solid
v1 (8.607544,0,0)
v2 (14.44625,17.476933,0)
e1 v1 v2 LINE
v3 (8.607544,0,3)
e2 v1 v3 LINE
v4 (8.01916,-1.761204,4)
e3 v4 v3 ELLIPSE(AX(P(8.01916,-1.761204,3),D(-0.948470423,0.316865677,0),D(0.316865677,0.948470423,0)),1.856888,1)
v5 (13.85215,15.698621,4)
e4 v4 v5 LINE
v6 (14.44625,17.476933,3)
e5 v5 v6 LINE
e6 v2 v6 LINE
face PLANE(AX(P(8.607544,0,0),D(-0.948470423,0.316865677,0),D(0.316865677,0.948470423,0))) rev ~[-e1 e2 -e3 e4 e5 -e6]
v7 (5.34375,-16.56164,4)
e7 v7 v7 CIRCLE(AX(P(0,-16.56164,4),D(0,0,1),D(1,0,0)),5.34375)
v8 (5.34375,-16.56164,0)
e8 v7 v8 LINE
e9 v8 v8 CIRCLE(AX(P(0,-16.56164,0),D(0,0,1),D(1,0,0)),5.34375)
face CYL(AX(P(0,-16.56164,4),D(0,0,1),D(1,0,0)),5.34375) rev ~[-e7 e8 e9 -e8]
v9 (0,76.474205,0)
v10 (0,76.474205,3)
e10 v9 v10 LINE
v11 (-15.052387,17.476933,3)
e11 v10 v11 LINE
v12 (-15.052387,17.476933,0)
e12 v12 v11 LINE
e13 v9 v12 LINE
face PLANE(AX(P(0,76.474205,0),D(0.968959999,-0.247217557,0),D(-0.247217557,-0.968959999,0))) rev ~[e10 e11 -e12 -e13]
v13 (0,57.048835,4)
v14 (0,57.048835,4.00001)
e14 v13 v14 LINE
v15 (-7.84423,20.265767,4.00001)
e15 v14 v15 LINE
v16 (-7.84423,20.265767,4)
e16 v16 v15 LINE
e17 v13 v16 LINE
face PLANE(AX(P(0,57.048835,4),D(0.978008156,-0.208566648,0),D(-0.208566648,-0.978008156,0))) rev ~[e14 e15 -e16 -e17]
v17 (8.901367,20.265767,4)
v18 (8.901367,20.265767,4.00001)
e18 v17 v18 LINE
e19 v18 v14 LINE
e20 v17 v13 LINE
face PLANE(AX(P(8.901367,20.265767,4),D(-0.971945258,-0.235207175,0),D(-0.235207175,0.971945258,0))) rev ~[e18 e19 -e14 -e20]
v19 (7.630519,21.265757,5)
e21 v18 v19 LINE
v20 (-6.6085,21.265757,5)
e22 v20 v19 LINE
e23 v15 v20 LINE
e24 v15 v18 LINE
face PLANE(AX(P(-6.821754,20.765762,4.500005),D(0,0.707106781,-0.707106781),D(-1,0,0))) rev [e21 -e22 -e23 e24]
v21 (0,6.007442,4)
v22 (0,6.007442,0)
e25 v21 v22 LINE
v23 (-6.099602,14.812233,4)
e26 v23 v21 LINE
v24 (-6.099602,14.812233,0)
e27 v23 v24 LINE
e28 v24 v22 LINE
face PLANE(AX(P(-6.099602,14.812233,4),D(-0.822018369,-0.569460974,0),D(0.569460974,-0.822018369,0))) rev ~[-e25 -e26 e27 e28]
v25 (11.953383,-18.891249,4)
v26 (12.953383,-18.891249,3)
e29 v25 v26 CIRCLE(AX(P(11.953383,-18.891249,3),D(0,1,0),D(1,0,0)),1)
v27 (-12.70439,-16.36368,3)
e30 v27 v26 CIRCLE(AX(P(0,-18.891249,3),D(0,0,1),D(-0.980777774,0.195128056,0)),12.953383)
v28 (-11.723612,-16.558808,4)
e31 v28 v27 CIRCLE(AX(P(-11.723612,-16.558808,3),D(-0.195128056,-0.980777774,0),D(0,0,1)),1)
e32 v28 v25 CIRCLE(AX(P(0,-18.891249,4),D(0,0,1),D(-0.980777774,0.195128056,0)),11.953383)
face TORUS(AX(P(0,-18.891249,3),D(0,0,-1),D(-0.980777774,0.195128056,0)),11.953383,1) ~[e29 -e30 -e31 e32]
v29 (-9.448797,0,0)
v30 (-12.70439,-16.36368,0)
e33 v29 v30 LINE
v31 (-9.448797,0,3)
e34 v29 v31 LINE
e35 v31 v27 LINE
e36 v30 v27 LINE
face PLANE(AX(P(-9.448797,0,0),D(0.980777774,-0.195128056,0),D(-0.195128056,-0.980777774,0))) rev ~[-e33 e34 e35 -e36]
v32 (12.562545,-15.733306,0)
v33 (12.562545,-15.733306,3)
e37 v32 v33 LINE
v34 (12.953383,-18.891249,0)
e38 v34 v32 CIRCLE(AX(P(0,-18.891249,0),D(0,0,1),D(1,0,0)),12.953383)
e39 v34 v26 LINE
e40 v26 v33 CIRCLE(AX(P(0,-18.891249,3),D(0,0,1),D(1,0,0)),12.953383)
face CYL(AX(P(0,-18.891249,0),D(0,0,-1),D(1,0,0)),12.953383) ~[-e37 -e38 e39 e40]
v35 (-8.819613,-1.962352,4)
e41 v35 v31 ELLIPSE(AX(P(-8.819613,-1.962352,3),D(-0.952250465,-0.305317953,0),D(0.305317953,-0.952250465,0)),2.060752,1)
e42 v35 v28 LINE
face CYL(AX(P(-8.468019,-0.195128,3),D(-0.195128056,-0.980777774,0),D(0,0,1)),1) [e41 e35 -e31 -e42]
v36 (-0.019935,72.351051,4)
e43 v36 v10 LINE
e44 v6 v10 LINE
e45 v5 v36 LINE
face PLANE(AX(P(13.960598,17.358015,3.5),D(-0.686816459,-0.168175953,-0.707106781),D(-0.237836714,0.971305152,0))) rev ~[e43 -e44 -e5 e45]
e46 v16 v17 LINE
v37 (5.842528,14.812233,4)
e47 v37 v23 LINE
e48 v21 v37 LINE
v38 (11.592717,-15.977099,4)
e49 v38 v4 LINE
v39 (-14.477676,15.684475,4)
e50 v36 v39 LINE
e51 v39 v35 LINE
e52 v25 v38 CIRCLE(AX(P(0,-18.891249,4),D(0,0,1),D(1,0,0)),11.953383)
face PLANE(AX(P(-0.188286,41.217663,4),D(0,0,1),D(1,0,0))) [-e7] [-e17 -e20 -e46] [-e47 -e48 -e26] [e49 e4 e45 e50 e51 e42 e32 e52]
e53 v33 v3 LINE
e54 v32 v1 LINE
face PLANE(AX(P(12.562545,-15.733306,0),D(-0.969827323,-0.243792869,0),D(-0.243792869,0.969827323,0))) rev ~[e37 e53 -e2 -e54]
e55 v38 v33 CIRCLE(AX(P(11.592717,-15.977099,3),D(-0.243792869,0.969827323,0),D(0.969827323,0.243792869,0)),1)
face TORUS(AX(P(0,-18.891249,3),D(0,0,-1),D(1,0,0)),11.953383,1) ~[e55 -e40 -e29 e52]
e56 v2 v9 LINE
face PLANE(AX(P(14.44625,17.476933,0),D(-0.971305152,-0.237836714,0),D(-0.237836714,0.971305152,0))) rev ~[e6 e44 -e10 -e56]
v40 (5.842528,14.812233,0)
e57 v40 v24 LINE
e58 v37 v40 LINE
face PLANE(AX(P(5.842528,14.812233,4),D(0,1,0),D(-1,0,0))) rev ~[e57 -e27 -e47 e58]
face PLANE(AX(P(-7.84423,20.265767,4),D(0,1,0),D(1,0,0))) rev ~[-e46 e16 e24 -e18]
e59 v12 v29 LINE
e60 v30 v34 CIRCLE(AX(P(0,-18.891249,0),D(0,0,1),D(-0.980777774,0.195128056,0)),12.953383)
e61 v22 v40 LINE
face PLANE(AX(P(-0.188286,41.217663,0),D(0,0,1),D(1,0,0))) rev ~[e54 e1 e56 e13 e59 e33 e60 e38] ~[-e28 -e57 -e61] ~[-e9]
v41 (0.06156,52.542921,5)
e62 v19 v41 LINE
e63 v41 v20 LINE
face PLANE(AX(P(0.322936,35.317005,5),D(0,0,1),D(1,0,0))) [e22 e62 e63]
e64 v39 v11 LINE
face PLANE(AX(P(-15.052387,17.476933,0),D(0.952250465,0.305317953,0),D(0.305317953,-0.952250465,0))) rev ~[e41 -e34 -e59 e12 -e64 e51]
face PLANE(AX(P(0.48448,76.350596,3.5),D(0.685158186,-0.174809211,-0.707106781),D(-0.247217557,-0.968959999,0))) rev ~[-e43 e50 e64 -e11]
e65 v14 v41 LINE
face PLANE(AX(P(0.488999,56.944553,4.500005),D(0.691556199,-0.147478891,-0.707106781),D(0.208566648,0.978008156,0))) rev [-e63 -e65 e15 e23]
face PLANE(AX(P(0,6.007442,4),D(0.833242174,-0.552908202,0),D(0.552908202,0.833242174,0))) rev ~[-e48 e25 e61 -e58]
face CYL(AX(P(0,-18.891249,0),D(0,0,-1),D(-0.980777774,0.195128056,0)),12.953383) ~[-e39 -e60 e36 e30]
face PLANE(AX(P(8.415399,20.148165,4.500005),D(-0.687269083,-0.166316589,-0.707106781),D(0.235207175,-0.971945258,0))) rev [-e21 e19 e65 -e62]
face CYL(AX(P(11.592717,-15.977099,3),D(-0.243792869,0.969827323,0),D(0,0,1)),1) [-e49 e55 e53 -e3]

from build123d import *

# Parameters (mm, degrees)
F1_DEPTH = 4
F2_R     = 5.3437499794
F3_DEPTH = 25.4
F5_DEPTH = 25.4
F7_DEPTH = 1
F8_SIZE  = 0.99999
F9_SIZE  = 0.99999
F10_SIZE = 1
F11_R    = 1


# Not quite as in the source:
# - a fillet or chamfer is up to 0.001 mm smaller than in the source, because OpenCascade refuses the exact size


with BuildPart() as f1:
    # F0 (on Top) → F1 (new body)
    with BuildSketch(Plane.XY):
        Polygon((0, 76.4742046595), (-15.0523874909, 17.476933077), (14.446250163, 17.476933077), align=None)
        with BuildLine():
            Line((14.446250163, 17.476933077), (-15.0523874909, 17.476933077))
            Line((-15.0523874909, 17.476933077), (-9.4487972359, 0))
            Line((-9.4487972359, 0), (-12.7043901229, -16.3636804159))
            ThreePointArc((-12.7043901229, -16.3636804159), (-0.3230678893, -5.9418952878), (12.5625447422, -15.7333064535))
            Line((12.5625447422, -15.7333064535), (8.6075438617, 0))
            Line((8.6075438617, 0), (14.446250163, 17.476933077))
        make_face()
        with BuildLine():
            ThreePointArc((12.5625447422, -15.7333064535), (-0.3230678893, -5.9418952878), (-12.7043901229, -16.3636804159))
            ThreePointArc((-12.7043901229, -16.3636804159), (-1.2699015357, -31.782233325), (12.9533829787, -18.891248852))
            ThreePointArc((12.9533829787, -18.891248852), (12.8553020934, -17.3002307252), (12.5625447422, -15.7333064535))
        make_face()
    extrude(amount=F1_DEPTH)

    # F2 (on face) → F3 (cut)
    with BuildSketch(Plane.XY.offset(4)):
        with Locations((0, -16.5616404265)):
            Circle(F2_R)
    extrude(amount=-F3_DEPTH, mode=Mode.SUBTRACT)

    # F4 (on face) → F5 (cut)
    with BuildSketch(Plane.XY.offset(4)):
        Polygon((-6.0996017419, 14.8122329265), (0, 6.0074422508), (5.8425283059, 14.8122329265), align=None)
    extrude(amount=-F5_DEPTH, mode=Mode.SUBTRACT)

    # F6 (on face) → F7 (join)
    with BuildSketch(Plane.XY.offset(4)):
        Polygon((0, 57.0488348603), (-7.8442301601, 20.2657673508), (8.901366964, 20.2657673508), align=None)
    extrude(amount=F7_DEPTH)

    # F8 (size 1 in the source; OpenCascade refuses exactly that, so slightly less here)
    f8_edges = [f1.edges().sort_by_distance(p)[0] for p in [
        (-3.922115, 38.657301, 5),
        (4.450683, 38.657301, 5),
    ]]
    chamfer(f8_edges, length=F8_SIZE)

    # F9 (size 1 in the source; OpenCascade refuses exactly that, so slightly less here)
    f9_edges = [f1.edges().sort_by_distance(p)[0] for p in [
        (0.525379, 20.265767, 5),
    ]]
    chamfer(f9_edges, length=F9_SIZE)

    # F10
    f10_edges = [f1.edges().sort_by_distance(p)[0] for p in [
        (-7.526194, 46.975569, 4),
        (7.223125, 46.975569, 4),
    ]]
    chamfer(f10_edges, length=F10_SIZE)

    # F11
    f11_edges = [f1.edges().sort_by_distance(p)[0] for p in [
        (0.323068, -31.840602, 4),
    ]]
    fillet(f11_edges, radius=F11_R)


solid = f1.part
